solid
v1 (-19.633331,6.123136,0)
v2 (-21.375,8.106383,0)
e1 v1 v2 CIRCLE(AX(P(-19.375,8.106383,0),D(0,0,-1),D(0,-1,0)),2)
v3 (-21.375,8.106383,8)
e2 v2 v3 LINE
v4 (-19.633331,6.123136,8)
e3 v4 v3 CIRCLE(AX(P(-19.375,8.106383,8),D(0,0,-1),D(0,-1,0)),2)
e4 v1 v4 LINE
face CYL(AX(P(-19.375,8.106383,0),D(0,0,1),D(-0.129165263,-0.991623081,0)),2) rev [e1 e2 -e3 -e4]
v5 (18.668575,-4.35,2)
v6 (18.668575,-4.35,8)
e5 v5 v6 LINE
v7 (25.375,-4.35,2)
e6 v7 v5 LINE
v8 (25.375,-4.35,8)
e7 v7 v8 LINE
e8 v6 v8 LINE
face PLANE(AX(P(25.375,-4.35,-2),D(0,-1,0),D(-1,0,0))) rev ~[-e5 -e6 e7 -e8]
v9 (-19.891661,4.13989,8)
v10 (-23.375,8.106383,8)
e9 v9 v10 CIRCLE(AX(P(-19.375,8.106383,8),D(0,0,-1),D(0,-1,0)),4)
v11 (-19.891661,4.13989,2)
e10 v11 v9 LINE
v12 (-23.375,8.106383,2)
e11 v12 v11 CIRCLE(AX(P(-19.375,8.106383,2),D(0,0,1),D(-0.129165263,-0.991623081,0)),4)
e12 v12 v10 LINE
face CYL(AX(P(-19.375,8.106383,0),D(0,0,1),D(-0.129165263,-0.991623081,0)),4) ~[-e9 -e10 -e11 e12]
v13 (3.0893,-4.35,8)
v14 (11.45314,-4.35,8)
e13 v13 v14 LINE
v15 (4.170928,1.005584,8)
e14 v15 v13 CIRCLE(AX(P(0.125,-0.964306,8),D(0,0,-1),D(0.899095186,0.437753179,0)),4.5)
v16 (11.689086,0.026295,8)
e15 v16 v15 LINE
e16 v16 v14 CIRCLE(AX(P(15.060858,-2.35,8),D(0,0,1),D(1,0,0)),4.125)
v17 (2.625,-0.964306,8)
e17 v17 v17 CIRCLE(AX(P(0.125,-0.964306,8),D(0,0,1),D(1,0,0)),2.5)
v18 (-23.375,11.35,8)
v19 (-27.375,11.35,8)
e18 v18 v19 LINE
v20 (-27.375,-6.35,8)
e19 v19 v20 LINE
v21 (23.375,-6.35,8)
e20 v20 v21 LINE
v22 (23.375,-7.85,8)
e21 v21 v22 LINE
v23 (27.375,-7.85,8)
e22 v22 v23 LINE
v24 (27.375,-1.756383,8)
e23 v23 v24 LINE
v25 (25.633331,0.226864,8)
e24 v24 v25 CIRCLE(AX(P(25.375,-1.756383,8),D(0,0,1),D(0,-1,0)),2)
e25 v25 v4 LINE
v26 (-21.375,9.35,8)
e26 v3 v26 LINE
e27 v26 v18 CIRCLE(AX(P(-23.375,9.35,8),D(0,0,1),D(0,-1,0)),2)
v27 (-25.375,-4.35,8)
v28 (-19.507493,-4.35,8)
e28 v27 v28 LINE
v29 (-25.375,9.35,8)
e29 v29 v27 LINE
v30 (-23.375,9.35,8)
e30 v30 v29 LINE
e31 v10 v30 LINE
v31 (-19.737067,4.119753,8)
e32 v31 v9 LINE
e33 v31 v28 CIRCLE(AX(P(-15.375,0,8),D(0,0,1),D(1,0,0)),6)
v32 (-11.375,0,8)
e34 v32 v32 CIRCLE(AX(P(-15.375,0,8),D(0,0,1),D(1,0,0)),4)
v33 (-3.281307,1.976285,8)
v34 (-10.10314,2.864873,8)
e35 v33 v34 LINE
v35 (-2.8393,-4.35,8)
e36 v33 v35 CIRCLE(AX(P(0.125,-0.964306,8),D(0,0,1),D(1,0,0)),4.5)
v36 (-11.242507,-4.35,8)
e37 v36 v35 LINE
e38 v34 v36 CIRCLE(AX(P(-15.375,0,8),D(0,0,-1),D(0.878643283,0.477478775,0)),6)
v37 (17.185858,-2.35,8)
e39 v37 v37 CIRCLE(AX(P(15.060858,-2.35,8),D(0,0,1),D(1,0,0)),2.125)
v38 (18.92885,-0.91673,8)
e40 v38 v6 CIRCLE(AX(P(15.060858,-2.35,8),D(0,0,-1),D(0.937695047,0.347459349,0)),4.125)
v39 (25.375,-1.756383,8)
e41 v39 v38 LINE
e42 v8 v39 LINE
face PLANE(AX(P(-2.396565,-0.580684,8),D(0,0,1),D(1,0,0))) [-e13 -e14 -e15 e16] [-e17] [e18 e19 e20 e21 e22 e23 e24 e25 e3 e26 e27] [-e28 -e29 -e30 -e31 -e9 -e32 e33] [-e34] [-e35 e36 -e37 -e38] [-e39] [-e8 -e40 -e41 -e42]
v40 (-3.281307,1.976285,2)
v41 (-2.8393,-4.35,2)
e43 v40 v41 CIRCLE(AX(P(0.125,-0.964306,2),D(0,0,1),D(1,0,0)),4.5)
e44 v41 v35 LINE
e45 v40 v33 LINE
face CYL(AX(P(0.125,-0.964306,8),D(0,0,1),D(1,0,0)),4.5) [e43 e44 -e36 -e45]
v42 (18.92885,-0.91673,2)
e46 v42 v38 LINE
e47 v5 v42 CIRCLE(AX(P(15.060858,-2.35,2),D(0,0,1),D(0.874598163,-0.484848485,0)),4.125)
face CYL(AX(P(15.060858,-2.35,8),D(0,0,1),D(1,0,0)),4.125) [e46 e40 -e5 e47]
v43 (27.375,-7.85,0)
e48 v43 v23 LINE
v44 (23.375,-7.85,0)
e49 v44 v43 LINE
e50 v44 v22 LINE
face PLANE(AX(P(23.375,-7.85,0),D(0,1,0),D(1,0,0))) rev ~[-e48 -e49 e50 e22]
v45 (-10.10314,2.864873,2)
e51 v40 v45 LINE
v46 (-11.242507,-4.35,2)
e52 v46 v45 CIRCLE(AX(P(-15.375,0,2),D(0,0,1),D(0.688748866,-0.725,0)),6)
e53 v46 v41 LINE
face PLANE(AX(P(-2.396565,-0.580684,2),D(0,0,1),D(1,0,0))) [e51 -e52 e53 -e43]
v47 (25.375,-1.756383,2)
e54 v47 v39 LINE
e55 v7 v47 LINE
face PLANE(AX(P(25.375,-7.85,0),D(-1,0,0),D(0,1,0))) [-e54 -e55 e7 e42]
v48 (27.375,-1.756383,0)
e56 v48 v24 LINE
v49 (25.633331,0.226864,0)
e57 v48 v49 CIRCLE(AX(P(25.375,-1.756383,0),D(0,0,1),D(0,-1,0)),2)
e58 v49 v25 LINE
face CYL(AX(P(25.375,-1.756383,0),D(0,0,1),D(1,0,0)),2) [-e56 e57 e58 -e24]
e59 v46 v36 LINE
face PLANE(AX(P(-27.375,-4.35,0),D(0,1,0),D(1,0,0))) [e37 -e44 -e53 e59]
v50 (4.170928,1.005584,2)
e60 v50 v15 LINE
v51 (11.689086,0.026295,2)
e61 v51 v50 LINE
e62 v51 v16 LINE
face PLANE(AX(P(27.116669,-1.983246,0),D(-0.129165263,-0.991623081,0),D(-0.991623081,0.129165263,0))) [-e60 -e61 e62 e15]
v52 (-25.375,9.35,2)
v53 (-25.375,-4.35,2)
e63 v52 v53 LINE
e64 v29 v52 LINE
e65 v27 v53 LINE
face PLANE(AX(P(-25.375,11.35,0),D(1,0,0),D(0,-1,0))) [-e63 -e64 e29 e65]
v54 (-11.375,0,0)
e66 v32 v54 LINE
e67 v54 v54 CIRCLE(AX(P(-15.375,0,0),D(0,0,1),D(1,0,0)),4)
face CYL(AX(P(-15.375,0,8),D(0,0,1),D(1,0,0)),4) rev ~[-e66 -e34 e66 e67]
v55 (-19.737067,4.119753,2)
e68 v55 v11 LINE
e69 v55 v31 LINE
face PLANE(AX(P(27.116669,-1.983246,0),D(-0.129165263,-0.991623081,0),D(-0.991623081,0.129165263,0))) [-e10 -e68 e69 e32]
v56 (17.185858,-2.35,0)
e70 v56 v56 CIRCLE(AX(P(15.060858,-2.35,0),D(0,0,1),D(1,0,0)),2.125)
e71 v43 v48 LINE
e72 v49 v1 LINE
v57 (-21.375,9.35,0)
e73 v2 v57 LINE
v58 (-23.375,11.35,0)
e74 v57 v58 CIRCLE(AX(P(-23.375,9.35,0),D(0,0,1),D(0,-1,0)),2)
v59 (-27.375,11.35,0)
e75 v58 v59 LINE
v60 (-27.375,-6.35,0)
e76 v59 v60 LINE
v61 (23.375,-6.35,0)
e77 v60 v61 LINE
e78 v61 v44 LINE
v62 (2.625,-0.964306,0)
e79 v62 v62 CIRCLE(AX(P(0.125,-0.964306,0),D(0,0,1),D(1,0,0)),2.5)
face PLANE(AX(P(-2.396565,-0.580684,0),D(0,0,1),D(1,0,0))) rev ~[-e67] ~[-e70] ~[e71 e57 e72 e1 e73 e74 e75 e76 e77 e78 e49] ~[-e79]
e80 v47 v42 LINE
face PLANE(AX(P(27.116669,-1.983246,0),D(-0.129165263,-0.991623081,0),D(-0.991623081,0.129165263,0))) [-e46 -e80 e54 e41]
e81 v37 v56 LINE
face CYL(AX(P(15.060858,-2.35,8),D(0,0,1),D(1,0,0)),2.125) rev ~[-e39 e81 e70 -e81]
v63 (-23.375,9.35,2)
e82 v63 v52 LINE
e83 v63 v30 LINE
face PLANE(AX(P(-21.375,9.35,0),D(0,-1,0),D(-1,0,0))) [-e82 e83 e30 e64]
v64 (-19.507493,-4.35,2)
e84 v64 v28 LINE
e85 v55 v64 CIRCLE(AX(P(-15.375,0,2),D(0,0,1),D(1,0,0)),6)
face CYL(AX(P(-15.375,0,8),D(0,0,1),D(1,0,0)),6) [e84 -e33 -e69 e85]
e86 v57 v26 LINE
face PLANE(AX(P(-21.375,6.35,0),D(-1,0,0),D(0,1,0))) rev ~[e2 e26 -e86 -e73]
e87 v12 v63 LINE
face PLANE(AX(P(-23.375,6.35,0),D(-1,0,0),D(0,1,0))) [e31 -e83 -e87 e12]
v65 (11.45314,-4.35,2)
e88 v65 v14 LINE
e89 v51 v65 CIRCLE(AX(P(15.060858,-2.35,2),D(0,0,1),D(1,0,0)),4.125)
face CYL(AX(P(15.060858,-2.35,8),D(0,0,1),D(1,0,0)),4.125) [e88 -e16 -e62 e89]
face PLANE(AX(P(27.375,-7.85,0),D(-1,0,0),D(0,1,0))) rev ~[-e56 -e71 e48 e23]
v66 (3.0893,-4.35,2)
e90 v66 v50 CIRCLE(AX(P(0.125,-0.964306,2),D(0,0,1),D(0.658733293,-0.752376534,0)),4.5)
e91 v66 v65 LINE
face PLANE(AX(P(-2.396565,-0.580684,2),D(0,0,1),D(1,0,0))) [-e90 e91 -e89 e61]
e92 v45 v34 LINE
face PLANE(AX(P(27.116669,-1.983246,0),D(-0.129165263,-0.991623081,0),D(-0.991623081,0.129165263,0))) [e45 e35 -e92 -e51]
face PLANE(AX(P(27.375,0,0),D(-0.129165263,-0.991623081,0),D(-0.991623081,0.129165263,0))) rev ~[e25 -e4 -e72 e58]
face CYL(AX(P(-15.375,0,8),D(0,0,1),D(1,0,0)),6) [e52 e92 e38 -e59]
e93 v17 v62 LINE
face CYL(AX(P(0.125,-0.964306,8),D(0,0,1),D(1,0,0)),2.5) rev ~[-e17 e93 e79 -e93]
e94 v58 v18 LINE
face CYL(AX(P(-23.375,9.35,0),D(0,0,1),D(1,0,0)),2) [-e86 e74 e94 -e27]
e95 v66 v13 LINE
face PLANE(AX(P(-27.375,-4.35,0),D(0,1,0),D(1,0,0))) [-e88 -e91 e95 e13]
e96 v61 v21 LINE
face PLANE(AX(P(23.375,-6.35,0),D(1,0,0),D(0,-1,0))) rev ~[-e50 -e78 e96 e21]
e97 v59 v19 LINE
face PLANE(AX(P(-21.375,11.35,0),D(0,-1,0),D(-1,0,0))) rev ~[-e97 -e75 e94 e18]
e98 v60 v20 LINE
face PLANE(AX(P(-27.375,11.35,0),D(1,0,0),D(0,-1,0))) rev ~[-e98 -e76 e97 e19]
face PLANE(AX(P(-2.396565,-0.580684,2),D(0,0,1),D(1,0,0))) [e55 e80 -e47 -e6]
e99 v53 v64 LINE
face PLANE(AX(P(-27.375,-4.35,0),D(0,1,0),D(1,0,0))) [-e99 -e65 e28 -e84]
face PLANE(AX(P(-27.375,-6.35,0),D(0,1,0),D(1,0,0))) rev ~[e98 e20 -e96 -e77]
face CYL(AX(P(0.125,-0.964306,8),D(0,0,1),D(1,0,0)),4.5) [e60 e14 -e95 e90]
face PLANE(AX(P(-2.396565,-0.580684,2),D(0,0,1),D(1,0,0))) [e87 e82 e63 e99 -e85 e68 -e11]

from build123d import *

# Parameters (mm, degrees)
F1_DEPTH    = 8
F2_R        = 2
F3_R        = 4
F3_R_2      = 2.5
F3_R_3      = 2.125
F4_DEPTH    = 8.001
F5_T        = 2
F5_T3_DEPTH = 12


# Not quite as in the source:
# - a shell that OpenCascade refuses in one call is made with other operations: the cavity is built on its own and cut out


with BuildPart() as f1:
    # F0 (on Top) → F1 (new body)
    with BuildSketch(Plane.XY):
        Polygon((-27.375, -6.35), (23.375, -6.35), (23.375, -7.85), (27.375, -7.85), (27.375, -6.35), (27.375, 0), (-21.375, 6.35), (-21.375, 11.35), (-27.375, 11.35), (-27.375, 6.35), align=None)
    extrude(amount=F1_DEPTH)

    # F2
    f2_edges = [f1.edges().sort_by_distance(p)[0] for p in [
        (-21.375, 11.35, 4),
        (27.375, 0, 4),
        (-21.375, 6.35, 4),
    ]]
    fillet(f2_edges, radius=F2_R)

    # F3 (on face) → F4 (cut, through all)
    with BuildSketch(Plane.XY.offset(8)):
        with Locations((-15.375, 0)):
            Circle(F3_R)
        with Locations((0.125, -0.9643055964)):
            Circle(F3_R_2)
        with Locations((15.0608578937, -2.35)):
            Circle(F3_R_3)
    extrude(amount=-F4_DEPTH, mode=Mode.SUBTRACT)

    # F5: shell of thickness 2, made by hand


with BuildPart() as f5_core1:
    # F5_t2: copy of F1
    add(f1.part)

    # the walls: a layer under each face that stays
    f5_faces = [f5_core1.faces().sort_by_distance(p)[0] for p in [
        (27.375, -4.8031912743, 4),
        (25.375, -7.85, 4),
        (3, 3.175, 4),
        (23.375, -7.1, 4),
        (-20.8777742764, 6.7866592918, 4),
        (-2, -6.35, 4),
        (-21.375, 8.7281912743, 4),
        (-27.375, 2.5, 4),
        (-25.375, 11.35, 4),
        (-2.375, -0.9643055964, 4),
        (12.9358578937, -2.35, 4),
        (-19.375, 0, 4),
        (0, 1.75, 0),
    ]]
    thicken(f5_faces, amount=-F5_T, mode=Mode.SUBTRACT)

    # F5_s4 → F5_t3 (cut)
    with BuildSketch(Plane.XY.offset(-2)):
        Polygon((23.355, -6.37), (25.375, -6.35), (25.375, -4.35), (23.375, -4.35), align=None)
    extrude(amount=F5_T3_DEPTH, mode=Mode.SUBTRACT)


with BuildPart() as f1_1:
    add(f1.part)

    # what is left inside the walls is the cavity
    f5_cavity = [f5_core1.part.solids().sort_by_distance(p)[0] for p in [
        (22.021788, -4.33, 6),
        (7.27122, -4.33, 6),
        (-25.355, 2.5, 6),
        (-7.040903, -4.33, 6),
    ]]
    add(f5_cavity, mode=Mode.SUBTRACT)


solid = f1_1.part
